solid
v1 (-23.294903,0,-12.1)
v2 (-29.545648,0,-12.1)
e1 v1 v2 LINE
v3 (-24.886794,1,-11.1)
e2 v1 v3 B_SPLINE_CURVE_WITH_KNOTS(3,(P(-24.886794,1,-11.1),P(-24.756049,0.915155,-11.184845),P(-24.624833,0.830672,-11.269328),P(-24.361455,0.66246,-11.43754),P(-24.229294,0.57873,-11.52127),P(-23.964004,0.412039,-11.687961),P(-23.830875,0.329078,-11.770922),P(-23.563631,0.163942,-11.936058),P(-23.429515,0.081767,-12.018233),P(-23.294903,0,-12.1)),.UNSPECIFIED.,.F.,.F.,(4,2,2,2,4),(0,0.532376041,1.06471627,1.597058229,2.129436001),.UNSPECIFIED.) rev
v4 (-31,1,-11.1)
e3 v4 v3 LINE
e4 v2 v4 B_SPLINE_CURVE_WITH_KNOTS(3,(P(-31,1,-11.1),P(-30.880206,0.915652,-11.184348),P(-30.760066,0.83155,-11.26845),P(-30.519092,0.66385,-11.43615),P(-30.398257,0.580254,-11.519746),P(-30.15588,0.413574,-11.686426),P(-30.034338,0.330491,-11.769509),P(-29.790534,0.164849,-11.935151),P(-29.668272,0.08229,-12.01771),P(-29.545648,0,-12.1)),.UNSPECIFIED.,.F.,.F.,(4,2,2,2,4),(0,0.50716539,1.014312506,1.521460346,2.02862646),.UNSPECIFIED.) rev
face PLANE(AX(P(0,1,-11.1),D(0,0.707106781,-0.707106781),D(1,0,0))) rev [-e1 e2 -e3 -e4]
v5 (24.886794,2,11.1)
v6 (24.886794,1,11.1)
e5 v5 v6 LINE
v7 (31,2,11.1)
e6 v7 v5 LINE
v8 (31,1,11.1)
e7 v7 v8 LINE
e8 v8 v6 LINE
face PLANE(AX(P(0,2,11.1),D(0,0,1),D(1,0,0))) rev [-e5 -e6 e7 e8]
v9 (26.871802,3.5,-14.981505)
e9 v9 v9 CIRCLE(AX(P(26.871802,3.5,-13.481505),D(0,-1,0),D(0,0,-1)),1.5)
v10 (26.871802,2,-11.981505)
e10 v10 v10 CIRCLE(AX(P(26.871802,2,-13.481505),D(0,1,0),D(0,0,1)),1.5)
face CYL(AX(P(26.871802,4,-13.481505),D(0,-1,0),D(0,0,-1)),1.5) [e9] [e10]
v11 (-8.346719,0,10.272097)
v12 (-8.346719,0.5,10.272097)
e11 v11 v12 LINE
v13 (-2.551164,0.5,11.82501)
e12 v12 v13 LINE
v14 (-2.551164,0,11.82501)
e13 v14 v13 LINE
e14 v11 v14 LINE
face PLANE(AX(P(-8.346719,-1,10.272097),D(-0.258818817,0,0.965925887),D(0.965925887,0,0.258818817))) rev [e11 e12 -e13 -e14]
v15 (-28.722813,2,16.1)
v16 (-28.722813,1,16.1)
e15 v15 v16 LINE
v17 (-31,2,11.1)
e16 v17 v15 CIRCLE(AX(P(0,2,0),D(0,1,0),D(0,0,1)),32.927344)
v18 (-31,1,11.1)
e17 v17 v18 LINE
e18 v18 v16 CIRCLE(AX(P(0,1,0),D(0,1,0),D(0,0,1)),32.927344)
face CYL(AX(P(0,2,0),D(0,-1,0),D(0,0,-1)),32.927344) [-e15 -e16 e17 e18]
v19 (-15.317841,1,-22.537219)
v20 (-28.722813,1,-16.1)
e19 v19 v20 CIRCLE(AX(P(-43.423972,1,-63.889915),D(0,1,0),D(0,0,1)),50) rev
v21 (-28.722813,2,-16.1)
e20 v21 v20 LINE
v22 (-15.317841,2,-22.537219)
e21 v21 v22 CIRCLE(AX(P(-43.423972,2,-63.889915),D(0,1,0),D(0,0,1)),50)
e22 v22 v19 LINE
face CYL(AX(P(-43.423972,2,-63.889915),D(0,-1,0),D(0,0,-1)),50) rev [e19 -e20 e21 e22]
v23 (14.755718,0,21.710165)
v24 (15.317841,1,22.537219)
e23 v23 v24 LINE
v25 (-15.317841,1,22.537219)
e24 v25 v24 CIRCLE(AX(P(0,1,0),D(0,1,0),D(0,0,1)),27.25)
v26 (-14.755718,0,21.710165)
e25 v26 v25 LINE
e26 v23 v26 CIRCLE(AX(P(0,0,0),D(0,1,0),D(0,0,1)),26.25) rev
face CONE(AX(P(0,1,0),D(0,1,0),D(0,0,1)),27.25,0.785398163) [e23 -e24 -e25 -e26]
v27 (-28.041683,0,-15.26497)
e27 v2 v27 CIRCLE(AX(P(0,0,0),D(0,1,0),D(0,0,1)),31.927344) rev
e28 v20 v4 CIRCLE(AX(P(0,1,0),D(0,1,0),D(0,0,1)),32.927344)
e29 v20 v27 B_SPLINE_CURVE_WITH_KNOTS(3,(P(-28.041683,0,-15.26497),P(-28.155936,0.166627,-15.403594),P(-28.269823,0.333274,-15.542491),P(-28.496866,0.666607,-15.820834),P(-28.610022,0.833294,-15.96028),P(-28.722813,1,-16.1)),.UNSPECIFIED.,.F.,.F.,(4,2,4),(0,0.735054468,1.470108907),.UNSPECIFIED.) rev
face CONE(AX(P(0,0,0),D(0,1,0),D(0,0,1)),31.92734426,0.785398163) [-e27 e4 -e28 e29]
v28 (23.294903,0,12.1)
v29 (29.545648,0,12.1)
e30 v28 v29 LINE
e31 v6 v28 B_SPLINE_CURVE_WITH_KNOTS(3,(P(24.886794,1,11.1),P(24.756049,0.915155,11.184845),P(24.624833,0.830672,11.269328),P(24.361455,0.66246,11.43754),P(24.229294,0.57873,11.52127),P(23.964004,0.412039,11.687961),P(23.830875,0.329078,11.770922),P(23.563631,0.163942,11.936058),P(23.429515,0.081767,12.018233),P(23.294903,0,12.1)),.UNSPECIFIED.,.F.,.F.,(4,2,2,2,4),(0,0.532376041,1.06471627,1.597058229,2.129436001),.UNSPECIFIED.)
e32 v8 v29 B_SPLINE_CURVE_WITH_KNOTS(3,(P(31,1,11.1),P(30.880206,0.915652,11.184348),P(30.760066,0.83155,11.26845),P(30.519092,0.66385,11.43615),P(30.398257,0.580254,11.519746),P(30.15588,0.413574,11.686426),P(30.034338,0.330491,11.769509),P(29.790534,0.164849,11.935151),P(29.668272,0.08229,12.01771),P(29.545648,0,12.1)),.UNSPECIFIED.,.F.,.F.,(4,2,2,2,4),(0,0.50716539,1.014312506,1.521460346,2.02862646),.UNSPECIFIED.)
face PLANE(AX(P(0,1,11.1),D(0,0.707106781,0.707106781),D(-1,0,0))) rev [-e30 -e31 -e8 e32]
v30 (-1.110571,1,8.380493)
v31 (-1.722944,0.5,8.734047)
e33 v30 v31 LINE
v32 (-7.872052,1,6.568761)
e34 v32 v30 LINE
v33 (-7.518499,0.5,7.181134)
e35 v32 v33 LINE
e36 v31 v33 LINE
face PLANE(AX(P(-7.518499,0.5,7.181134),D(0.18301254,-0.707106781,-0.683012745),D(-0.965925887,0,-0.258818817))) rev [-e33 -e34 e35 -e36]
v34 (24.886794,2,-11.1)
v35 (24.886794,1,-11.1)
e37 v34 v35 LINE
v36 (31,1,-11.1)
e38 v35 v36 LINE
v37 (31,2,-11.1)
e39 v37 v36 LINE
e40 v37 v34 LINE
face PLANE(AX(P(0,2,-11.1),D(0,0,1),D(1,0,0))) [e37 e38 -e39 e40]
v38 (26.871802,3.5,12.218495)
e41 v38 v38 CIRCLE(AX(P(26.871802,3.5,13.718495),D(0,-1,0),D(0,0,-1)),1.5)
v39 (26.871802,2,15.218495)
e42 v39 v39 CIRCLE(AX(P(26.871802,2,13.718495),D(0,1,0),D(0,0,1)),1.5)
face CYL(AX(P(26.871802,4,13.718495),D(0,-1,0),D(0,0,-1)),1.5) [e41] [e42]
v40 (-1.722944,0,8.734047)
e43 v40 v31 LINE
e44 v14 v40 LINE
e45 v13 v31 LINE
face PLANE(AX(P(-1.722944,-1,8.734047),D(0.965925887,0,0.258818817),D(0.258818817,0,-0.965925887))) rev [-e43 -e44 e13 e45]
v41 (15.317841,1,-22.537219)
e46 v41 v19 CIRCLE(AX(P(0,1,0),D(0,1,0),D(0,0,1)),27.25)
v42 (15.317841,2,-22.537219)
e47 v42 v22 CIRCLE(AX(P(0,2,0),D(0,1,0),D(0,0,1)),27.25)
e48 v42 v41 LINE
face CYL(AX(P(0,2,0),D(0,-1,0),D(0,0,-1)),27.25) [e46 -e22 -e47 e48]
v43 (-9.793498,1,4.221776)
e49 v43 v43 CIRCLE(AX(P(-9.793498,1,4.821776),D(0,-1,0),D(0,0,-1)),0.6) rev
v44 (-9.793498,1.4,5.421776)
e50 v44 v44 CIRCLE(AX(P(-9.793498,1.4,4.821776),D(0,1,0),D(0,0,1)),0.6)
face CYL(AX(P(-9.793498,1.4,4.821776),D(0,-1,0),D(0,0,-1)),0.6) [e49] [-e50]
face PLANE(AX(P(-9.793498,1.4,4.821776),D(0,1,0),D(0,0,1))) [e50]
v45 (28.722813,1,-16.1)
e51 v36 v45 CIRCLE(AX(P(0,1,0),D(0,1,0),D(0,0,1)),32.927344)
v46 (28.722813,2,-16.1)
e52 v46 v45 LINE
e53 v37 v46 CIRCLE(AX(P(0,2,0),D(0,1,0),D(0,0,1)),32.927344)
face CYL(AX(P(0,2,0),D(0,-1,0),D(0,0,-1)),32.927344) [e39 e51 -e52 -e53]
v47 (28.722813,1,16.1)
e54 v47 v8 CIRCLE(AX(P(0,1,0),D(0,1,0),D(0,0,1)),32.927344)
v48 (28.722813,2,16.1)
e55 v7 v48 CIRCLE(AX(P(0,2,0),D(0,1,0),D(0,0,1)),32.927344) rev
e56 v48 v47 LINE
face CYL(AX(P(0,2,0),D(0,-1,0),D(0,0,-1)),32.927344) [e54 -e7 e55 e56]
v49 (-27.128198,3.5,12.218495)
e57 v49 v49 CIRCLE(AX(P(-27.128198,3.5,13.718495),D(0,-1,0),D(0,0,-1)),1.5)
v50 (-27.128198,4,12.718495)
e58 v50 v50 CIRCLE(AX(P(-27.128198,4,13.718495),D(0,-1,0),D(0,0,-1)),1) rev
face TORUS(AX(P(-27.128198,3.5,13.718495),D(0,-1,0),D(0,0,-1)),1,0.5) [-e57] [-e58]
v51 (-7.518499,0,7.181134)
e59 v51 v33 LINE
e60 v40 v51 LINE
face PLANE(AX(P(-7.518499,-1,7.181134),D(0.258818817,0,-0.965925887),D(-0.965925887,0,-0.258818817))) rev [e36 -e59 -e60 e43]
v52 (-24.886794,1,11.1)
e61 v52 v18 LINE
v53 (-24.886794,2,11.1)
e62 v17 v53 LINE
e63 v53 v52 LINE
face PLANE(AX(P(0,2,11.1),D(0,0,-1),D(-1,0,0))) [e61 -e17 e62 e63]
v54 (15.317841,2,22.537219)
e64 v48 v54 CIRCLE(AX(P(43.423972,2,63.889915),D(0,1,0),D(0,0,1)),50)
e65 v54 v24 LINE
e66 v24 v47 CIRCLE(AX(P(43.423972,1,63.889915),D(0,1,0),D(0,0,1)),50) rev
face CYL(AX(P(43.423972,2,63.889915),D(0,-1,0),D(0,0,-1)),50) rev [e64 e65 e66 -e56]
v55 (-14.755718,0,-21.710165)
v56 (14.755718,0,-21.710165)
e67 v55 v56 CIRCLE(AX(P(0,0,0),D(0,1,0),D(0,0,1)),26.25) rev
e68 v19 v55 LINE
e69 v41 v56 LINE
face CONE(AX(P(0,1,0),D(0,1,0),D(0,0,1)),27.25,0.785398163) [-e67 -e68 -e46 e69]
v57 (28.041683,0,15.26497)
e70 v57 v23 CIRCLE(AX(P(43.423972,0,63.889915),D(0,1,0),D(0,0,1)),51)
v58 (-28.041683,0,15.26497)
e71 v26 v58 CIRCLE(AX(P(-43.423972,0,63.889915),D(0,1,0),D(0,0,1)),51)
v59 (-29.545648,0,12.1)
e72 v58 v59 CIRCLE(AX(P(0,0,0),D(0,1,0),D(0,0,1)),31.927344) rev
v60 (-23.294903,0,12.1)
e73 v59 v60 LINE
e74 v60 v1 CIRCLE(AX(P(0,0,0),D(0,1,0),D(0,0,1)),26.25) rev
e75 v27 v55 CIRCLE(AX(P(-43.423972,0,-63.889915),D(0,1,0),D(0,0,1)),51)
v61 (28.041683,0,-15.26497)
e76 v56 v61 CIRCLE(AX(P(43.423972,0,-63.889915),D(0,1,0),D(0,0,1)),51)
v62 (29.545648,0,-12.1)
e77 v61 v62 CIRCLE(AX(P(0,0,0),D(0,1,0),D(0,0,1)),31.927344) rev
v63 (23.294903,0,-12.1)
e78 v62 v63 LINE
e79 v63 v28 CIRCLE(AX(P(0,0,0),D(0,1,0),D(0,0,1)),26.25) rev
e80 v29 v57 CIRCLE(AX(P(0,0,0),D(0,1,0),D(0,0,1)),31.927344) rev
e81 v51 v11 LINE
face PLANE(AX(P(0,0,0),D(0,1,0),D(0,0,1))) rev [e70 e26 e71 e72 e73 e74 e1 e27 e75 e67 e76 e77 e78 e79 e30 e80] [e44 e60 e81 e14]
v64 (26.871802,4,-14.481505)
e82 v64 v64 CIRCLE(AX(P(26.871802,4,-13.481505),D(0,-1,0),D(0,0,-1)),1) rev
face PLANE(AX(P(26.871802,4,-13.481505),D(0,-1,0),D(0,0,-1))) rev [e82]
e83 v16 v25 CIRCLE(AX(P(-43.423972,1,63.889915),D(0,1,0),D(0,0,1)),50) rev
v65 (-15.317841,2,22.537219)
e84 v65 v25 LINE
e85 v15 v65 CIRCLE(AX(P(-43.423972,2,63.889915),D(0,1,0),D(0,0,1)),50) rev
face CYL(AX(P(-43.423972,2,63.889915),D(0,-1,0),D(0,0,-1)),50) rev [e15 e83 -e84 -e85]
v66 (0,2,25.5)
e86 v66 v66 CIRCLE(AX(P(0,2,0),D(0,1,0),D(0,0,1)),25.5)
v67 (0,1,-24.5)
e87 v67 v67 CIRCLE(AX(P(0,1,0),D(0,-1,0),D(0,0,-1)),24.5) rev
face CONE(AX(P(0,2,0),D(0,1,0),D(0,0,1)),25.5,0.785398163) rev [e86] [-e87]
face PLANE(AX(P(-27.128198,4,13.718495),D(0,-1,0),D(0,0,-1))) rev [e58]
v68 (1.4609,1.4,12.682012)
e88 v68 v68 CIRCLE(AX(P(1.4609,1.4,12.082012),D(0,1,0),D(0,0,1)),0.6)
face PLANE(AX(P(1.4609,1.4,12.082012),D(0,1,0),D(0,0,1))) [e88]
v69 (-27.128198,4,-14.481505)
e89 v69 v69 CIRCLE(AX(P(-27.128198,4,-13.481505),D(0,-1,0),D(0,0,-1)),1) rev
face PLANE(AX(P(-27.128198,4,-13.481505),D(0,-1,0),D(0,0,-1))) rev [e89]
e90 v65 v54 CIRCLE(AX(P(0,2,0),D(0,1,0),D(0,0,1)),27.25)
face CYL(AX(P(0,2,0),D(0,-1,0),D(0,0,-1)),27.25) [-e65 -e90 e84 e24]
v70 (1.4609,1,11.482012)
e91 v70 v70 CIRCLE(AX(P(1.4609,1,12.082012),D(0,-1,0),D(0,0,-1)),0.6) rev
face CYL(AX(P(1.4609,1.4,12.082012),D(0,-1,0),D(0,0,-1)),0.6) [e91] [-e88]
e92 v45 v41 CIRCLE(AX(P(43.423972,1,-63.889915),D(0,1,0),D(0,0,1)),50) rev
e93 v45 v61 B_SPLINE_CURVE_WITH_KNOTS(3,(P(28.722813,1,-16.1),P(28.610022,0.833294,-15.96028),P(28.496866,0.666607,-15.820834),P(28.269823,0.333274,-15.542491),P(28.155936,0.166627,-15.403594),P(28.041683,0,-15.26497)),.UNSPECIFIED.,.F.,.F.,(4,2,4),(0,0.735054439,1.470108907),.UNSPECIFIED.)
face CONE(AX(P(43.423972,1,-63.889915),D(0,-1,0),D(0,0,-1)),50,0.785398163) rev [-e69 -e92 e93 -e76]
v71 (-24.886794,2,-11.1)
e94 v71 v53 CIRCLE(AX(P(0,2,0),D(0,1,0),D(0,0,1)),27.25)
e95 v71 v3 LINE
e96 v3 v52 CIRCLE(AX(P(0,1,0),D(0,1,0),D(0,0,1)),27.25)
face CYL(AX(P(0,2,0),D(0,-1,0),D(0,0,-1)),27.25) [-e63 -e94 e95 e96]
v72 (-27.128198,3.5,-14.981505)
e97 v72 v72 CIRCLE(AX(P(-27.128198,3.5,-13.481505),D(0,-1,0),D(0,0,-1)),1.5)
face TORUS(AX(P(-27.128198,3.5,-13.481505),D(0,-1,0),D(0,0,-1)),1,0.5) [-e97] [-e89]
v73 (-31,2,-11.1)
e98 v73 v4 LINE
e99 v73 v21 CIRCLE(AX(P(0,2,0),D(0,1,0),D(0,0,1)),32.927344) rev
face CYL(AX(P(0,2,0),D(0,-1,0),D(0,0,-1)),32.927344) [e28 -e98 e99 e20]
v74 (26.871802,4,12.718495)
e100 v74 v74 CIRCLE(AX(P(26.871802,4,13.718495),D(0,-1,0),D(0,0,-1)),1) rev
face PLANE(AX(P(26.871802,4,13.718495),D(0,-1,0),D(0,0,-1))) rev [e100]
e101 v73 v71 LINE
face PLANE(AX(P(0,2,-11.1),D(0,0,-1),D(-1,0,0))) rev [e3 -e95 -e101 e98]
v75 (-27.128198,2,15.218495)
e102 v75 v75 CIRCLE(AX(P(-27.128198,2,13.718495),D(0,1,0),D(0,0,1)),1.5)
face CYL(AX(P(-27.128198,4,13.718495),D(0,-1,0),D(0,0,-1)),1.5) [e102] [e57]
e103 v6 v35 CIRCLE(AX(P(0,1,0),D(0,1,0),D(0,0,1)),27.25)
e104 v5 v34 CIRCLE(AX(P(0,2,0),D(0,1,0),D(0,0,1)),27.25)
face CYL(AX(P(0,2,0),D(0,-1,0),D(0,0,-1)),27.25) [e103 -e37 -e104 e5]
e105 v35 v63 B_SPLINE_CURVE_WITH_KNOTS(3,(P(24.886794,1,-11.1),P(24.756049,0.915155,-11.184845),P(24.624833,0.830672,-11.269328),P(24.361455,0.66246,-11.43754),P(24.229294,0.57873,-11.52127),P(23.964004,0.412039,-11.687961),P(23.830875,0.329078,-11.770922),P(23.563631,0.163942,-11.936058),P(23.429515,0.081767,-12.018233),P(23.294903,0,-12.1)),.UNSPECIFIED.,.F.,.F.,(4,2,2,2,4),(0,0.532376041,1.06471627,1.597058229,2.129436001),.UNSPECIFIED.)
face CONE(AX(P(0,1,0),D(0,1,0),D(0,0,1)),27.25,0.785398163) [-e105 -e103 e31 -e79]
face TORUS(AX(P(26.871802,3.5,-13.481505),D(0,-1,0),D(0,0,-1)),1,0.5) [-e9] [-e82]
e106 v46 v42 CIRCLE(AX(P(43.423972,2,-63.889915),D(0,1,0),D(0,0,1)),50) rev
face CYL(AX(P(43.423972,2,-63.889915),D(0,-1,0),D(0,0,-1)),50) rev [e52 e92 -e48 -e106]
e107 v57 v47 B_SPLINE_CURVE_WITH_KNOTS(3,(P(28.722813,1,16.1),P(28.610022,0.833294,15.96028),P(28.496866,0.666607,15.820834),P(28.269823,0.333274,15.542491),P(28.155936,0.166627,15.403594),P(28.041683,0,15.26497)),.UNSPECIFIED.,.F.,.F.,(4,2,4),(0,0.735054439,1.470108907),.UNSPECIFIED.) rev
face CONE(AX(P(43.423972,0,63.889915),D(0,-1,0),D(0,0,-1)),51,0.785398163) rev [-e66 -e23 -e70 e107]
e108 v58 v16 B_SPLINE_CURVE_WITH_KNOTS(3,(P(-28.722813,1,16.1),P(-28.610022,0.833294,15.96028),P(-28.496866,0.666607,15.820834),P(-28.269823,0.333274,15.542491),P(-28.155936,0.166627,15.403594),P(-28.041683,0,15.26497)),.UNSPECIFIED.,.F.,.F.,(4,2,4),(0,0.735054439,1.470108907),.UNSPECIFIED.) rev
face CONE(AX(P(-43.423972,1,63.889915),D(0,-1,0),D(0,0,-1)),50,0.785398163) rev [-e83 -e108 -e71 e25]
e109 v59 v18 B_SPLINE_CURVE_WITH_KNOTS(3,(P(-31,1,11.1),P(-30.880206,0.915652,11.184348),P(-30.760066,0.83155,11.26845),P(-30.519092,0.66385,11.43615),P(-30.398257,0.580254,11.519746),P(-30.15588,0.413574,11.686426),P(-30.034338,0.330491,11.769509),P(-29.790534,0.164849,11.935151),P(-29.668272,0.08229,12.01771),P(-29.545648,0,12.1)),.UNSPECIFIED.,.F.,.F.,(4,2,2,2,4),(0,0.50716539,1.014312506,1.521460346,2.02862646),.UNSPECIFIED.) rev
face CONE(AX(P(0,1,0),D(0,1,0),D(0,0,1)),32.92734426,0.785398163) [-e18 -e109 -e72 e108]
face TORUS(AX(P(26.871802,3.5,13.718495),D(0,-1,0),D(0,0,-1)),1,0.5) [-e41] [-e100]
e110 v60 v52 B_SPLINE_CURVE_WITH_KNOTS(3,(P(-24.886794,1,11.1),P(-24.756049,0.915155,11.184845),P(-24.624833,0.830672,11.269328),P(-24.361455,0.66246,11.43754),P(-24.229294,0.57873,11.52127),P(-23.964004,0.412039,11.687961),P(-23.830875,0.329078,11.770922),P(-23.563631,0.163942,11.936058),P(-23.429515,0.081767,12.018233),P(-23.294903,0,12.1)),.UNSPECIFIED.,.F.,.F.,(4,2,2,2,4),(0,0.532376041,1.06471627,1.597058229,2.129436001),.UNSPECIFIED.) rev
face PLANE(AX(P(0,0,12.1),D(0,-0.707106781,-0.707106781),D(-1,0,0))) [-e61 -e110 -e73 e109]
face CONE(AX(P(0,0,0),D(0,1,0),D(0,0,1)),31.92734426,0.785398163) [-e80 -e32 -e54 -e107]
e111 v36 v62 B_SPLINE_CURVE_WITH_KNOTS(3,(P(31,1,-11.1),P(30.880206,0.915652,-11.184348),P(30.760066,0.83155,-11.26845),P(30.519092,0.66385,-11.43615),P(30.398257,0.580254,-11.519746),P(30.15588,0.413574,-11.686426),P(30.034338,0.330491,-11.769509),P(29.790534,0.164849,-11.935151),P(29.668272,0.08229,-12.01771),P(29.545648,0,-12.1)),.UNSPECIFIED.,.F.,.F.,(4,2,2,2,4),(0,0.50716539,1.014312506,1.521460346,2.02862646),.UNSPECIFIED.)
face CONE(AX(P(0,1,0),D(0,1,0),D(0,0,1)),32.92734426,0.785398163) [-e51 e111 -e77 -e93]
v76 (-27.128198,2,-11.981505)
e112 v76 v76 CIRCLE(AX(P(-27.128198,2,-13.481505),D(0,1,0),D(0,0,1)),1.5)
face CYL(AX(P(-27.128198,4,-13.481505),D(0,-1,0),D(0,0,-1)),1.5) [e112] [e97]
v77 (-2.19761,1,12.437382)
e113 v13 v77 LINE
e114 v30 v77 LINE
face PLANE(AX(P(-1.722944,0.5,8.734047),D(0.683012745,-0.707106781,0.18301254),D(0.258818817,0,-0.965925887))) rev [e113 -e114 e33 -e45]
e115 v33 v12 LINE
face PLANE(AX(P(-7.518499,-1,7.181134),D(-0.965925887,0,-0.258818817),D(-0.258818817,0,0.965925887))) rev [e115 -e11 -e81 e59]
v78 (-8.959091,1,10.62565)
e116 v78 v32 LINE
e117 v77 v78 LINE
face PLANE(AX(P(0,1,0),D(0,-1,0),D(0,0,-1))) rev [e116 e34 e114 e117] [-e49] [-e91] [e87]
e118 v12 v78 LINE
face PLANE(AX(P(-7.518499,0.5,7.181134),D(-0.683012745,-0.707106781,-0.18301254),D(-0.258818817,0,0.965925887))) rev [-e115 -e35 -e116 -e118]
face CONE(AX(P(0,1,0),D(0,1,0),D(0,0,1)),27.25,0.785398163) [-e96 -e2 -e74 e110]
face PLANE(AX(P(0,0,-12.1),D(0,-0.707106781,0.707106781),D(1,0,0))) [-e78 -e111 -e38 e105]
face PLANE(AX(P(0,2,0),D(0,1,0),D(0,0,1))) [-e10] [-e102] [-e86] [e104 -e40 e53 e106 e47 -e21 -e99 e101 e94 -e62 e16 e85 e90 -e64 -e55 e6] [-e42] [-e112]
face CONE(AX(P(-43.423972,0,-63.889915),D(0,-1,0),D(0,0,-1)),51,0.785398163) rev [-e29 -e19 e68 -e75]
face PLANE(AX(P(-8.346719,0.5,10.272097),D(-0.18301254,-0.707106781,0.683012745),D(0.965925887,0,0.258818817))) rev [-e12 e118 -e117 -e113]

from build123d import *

# Parameters (mm, degrees)
SKETCH1_R           = 1.2
SKETCH1_R_2         = 27.25
SKETCH1_R_3         = 25.5
BOSS_EXTRUDE1_DEPTH = 2
SKETCH2_R           = 25.5
BOSS_EXTRUDE3_DEPTH = 1
SKETCH3_R           = 1.5
BOSS_EXTRUDE4_DEPTH = 4
CHAMFER1_SIZE       = 1
CHAMFER2_SIZE       = 1
CUT_EXTRUDE1_DEPTH  = 2
SKETCH5_R           = 0.6
BOSS_EXTRUDE5_DEPTH = 0.4
CHAMFER3_SIZE       = 0.5
FILLET1_R           = 0.5


with BuildPart() as part:
    # Sketch1 → Boss-Extrude1 (new body)
    # profile 1 of 5: a face of its own
    with BuildSketch(Plane(origin=(0, 0, 0), x_dir=(1, 0, 0), z_dir=(0, 1, 0))):
        with BuildLine():
            ThreePointArc((-28.722813233, 16.1), (-29.965874009, 13.647578353), (-31, 11.1))
            Line((-31, 11.1), (-24.886793687, 11.1))
            ThreePointArc((-24.886793687, 11.1), (-20.899896158, 17.485904054), (-15.317841085, 22.537219094))
            ThreePointArc((-15.317841085, 22.537219094), (-21.77967806, 18.817477861), (-28.722813233, 16.1))
        make_face()
        with Locations(Location((-27.128197522, 13.481505135, 0), (0, 0, 270))):
            Circle(SKETCH1_R, mode=Mode.SUBTRACT)
    # profile 2 of 5: a face of its own
    with BuildSketch(Plane(origin=(0, 0, 0), x_dir=(1, 0, 0), z_dir=(0, 1, 0))):
        with BuildLine():
            ThreePointArc((-15.317841085, -22.537219094), (-20.899896158, -17.485904054), (-24.886793687, -11.1))
            Line((-24.886793687, -11.1), (-31, -11.1))
            ThreePointArc((-31, -11.1), (-29.965874009, -13.647578353), (-28.722813233, -16.1))
            ThreePointArc((-28.722813233, -16.1), (-21.77967806, -18.817477861), (-15.317841085, -22.537219094))
        make_face()
        with Locations(Location((-27.128197522, -13.718494865, 0), (0, 0, 270))):
            Circle(SKETCH1_R, mode=Mode.SUBTRACT)
    # profile 3 of 5: a face of its own
    with BuildSketch(Plane(origin=(0, 0, 0), x_dir=(1, 0, 0), z_dir=(0, 1, 0))):
        Circle(SKETCH1_R_2)
        with Locations(Location((0, 0, 0), (0, 0, 270))):
            Circle(SKETCH1_R_3, mode=Mode.SUBTRACT)
    # profile 4 of 5: a face of its own
    with BuildSketch(Plane(origin=(0, 0, 0), x_dir=(1, 0, 0), z_dir=(0, 1, 0))):
        with BuildLine():
            ThreePointArc((24.886793687, -11.1), (20.899896158, -17.485904054), (15.317841085, -22.537219094))
            ThreePointArc((15.317841085, -22.537219094), (21.77967806, -18.817477861), (28.722813233, -16.1))
            ThreePointArc((28.722813233, -16.1), (29.965874009, -13.647578353), (31, -11.1))
            Line((31, -11.1), (24.886793687, -11.1))
        make_face()
        with Locations(Location((26.871802478, -13.718494865, 0), (0, 0, 270))):
            Circle(SKETCH1_R, mode=Mode.SUBTRACT)
    # profile 5 of 5: a face of its own
    with BuildSketch(Plane(origin=(0, 0, 0), x_dir=(1, 0, 0), z_dir=(0, 1, 0))):
        with BuildLine():
            ThreePointArc((28.722813233, 16.1), (21.77967806, 18.817477861), (15.317841085, 22.537219094))
            ThreePointArc((15.317841085, 22.537219094), (20.899896158, 17.485904054), (24.886793687, 11.1))
            Line((24.886793687, 11.1), (31, 11.1))
            ThreePointArc((31, 11.1), (29.965874009, 13.647578353), (28.722813233, 16.1))
        make_face()
        with Locations(Location((26.871802478, 13.481505135, 0), (0, 0, 270))):
            Circle(SKETCH1_R, mode=Mode.SUBTRACT)
    extrude(amount=BOSS_EXTRUDE1_DEPTH)

    # Sketch2 → Boss-Extrude3 (add)
    with BuildSketch(Plane.XZ):
        with Locations(Location((0, 0, 0), (0, 0, 270))):
            Circle(SKETCH2_R)
    extrude(amount=-BOSS_EXTRUDE3_DEPTH)

    # Sketch3 → Boss-Extrude4 (add)
    with BuildSketch(Plane.XZ):
        with Locations(Location((-27.128197522, 13.718494865, 0), (0, 0, 270))):
            Circle(SKETCH3_R)
        with Locations(Location((26.871802478, 13.718494865, 0), (0, 0, 270))):
            Circle(SKETCH3_R)
        with Locations(Location((26.871802478, -13.481505135, 0), (0, 0, 270))):
            Circle(SKETCH3_R)
        with Locations(Location((-27.128197522, -13.481505135, 0), (0, 0, 270))):
            Circle(SKETCH3_R)
    extrude(amount=-BOSS_EXTRUDE4_DEPTH)

    # Chamfer1
    chamfer1_edges = [part.edges().sort_by_distance(p)[0] for p in [
        (0, 0, -27.25),
        (21.77967806, 0, -18.817477861),
        (29.965874009, 0, -13.647578353),
        (27.943396843, 0, -11.1),
        (27.25, 0, 0),
        (27.943396843, 0, 11.1),
        (29.965874009, 0, 13.647578353),
        (21.77967806, 0, 18.817477861),
        (0, 0, 27.25),
        (-21.77967806, 0, 18.817477861),
        (-29.965874009, 0, 13.647578353),
        (-27.943396843, 0, 11.1),
        (-27.25, 0, 0),
        (-27.943396843, 0, -11.1),
        (-29.965874009, 0, -13.647578353),
        (-21.77967806, 0, -18.817477861),
    ]]
    chamfer(chamfer1_edges, length=CHAMFER1_SIZE)

    # Chamfer2
    chamfer2_edges = [part.edges().sort_by_distance(p)[0] for p in [
        (0, 1, -25.5),
    ]]
    chamfer(chamfer2_edges, length=CHAMFER2_SIZE - 0.0001)  # a hair under: the kernel refuses the full size

    # Sketch4 → Cut-Extrude1 (cut)
    with BuildSketch(Plane(origin=(0, 1, 0), x_dir=(1, 0, 0), z_dir=(0, 1, 0))):
        Polygon((-7.518498865, -7.181133816), (-1.722943541, -8.734046717), (-2.551163755, -11.825009557), (-8.346719079, -10.272096656), align=None)
    extrude(amount=-CUT_EXTRUDE1_DEPTH, mode=Mode.SUBTRACT)

    # Sketch5 → Boss-Extrude5 (add)
    with BuildSketch(Plane(origin=(0, 1, 0), x_dir=(1, 0, 0), z_dir=(0, 1, 0))):
        with Locations(Location((1.460899698, -12.082012325, 0), (0, 0, 90))):
            Circle(SKETCH5_R)
        with Locations(Location((-9.793498218, -4.821776272, 0), (0, 0, 90))):
            Circle(SKETCH5_R)
    extrude(amount=BOSS_EXTRUDE5_DEPTH)

    # Chamfer3
    chamfer3_edges = [part.edges().sort_by_distance(p)[0] for p in [
        (-7.932608972, 1, 8.726615236),
        (-5.448941417, 1, 11.048553106),
        (-2.137053648, 1, 10.279528137),
        (-4.620721203, 1, 7.957590266),
    ]]
    chamfer(chamfer3_edges, length=CHAMFER3_SIZE)

    # Fillet1
    fillet1_edges = [part.edges().sort_by_distance(p)[0] for p in [
        (-27.128197522, 4, 15.218494865),
        (26.871802478, 4, 15.218494865),
        (26.871802478, 4, -11.981505135),
        (-27.128197522, 4, -11.981505135),
    ]]
    fillet(fillet1_edges, radius=FILLET1_R)


solid = part.part
